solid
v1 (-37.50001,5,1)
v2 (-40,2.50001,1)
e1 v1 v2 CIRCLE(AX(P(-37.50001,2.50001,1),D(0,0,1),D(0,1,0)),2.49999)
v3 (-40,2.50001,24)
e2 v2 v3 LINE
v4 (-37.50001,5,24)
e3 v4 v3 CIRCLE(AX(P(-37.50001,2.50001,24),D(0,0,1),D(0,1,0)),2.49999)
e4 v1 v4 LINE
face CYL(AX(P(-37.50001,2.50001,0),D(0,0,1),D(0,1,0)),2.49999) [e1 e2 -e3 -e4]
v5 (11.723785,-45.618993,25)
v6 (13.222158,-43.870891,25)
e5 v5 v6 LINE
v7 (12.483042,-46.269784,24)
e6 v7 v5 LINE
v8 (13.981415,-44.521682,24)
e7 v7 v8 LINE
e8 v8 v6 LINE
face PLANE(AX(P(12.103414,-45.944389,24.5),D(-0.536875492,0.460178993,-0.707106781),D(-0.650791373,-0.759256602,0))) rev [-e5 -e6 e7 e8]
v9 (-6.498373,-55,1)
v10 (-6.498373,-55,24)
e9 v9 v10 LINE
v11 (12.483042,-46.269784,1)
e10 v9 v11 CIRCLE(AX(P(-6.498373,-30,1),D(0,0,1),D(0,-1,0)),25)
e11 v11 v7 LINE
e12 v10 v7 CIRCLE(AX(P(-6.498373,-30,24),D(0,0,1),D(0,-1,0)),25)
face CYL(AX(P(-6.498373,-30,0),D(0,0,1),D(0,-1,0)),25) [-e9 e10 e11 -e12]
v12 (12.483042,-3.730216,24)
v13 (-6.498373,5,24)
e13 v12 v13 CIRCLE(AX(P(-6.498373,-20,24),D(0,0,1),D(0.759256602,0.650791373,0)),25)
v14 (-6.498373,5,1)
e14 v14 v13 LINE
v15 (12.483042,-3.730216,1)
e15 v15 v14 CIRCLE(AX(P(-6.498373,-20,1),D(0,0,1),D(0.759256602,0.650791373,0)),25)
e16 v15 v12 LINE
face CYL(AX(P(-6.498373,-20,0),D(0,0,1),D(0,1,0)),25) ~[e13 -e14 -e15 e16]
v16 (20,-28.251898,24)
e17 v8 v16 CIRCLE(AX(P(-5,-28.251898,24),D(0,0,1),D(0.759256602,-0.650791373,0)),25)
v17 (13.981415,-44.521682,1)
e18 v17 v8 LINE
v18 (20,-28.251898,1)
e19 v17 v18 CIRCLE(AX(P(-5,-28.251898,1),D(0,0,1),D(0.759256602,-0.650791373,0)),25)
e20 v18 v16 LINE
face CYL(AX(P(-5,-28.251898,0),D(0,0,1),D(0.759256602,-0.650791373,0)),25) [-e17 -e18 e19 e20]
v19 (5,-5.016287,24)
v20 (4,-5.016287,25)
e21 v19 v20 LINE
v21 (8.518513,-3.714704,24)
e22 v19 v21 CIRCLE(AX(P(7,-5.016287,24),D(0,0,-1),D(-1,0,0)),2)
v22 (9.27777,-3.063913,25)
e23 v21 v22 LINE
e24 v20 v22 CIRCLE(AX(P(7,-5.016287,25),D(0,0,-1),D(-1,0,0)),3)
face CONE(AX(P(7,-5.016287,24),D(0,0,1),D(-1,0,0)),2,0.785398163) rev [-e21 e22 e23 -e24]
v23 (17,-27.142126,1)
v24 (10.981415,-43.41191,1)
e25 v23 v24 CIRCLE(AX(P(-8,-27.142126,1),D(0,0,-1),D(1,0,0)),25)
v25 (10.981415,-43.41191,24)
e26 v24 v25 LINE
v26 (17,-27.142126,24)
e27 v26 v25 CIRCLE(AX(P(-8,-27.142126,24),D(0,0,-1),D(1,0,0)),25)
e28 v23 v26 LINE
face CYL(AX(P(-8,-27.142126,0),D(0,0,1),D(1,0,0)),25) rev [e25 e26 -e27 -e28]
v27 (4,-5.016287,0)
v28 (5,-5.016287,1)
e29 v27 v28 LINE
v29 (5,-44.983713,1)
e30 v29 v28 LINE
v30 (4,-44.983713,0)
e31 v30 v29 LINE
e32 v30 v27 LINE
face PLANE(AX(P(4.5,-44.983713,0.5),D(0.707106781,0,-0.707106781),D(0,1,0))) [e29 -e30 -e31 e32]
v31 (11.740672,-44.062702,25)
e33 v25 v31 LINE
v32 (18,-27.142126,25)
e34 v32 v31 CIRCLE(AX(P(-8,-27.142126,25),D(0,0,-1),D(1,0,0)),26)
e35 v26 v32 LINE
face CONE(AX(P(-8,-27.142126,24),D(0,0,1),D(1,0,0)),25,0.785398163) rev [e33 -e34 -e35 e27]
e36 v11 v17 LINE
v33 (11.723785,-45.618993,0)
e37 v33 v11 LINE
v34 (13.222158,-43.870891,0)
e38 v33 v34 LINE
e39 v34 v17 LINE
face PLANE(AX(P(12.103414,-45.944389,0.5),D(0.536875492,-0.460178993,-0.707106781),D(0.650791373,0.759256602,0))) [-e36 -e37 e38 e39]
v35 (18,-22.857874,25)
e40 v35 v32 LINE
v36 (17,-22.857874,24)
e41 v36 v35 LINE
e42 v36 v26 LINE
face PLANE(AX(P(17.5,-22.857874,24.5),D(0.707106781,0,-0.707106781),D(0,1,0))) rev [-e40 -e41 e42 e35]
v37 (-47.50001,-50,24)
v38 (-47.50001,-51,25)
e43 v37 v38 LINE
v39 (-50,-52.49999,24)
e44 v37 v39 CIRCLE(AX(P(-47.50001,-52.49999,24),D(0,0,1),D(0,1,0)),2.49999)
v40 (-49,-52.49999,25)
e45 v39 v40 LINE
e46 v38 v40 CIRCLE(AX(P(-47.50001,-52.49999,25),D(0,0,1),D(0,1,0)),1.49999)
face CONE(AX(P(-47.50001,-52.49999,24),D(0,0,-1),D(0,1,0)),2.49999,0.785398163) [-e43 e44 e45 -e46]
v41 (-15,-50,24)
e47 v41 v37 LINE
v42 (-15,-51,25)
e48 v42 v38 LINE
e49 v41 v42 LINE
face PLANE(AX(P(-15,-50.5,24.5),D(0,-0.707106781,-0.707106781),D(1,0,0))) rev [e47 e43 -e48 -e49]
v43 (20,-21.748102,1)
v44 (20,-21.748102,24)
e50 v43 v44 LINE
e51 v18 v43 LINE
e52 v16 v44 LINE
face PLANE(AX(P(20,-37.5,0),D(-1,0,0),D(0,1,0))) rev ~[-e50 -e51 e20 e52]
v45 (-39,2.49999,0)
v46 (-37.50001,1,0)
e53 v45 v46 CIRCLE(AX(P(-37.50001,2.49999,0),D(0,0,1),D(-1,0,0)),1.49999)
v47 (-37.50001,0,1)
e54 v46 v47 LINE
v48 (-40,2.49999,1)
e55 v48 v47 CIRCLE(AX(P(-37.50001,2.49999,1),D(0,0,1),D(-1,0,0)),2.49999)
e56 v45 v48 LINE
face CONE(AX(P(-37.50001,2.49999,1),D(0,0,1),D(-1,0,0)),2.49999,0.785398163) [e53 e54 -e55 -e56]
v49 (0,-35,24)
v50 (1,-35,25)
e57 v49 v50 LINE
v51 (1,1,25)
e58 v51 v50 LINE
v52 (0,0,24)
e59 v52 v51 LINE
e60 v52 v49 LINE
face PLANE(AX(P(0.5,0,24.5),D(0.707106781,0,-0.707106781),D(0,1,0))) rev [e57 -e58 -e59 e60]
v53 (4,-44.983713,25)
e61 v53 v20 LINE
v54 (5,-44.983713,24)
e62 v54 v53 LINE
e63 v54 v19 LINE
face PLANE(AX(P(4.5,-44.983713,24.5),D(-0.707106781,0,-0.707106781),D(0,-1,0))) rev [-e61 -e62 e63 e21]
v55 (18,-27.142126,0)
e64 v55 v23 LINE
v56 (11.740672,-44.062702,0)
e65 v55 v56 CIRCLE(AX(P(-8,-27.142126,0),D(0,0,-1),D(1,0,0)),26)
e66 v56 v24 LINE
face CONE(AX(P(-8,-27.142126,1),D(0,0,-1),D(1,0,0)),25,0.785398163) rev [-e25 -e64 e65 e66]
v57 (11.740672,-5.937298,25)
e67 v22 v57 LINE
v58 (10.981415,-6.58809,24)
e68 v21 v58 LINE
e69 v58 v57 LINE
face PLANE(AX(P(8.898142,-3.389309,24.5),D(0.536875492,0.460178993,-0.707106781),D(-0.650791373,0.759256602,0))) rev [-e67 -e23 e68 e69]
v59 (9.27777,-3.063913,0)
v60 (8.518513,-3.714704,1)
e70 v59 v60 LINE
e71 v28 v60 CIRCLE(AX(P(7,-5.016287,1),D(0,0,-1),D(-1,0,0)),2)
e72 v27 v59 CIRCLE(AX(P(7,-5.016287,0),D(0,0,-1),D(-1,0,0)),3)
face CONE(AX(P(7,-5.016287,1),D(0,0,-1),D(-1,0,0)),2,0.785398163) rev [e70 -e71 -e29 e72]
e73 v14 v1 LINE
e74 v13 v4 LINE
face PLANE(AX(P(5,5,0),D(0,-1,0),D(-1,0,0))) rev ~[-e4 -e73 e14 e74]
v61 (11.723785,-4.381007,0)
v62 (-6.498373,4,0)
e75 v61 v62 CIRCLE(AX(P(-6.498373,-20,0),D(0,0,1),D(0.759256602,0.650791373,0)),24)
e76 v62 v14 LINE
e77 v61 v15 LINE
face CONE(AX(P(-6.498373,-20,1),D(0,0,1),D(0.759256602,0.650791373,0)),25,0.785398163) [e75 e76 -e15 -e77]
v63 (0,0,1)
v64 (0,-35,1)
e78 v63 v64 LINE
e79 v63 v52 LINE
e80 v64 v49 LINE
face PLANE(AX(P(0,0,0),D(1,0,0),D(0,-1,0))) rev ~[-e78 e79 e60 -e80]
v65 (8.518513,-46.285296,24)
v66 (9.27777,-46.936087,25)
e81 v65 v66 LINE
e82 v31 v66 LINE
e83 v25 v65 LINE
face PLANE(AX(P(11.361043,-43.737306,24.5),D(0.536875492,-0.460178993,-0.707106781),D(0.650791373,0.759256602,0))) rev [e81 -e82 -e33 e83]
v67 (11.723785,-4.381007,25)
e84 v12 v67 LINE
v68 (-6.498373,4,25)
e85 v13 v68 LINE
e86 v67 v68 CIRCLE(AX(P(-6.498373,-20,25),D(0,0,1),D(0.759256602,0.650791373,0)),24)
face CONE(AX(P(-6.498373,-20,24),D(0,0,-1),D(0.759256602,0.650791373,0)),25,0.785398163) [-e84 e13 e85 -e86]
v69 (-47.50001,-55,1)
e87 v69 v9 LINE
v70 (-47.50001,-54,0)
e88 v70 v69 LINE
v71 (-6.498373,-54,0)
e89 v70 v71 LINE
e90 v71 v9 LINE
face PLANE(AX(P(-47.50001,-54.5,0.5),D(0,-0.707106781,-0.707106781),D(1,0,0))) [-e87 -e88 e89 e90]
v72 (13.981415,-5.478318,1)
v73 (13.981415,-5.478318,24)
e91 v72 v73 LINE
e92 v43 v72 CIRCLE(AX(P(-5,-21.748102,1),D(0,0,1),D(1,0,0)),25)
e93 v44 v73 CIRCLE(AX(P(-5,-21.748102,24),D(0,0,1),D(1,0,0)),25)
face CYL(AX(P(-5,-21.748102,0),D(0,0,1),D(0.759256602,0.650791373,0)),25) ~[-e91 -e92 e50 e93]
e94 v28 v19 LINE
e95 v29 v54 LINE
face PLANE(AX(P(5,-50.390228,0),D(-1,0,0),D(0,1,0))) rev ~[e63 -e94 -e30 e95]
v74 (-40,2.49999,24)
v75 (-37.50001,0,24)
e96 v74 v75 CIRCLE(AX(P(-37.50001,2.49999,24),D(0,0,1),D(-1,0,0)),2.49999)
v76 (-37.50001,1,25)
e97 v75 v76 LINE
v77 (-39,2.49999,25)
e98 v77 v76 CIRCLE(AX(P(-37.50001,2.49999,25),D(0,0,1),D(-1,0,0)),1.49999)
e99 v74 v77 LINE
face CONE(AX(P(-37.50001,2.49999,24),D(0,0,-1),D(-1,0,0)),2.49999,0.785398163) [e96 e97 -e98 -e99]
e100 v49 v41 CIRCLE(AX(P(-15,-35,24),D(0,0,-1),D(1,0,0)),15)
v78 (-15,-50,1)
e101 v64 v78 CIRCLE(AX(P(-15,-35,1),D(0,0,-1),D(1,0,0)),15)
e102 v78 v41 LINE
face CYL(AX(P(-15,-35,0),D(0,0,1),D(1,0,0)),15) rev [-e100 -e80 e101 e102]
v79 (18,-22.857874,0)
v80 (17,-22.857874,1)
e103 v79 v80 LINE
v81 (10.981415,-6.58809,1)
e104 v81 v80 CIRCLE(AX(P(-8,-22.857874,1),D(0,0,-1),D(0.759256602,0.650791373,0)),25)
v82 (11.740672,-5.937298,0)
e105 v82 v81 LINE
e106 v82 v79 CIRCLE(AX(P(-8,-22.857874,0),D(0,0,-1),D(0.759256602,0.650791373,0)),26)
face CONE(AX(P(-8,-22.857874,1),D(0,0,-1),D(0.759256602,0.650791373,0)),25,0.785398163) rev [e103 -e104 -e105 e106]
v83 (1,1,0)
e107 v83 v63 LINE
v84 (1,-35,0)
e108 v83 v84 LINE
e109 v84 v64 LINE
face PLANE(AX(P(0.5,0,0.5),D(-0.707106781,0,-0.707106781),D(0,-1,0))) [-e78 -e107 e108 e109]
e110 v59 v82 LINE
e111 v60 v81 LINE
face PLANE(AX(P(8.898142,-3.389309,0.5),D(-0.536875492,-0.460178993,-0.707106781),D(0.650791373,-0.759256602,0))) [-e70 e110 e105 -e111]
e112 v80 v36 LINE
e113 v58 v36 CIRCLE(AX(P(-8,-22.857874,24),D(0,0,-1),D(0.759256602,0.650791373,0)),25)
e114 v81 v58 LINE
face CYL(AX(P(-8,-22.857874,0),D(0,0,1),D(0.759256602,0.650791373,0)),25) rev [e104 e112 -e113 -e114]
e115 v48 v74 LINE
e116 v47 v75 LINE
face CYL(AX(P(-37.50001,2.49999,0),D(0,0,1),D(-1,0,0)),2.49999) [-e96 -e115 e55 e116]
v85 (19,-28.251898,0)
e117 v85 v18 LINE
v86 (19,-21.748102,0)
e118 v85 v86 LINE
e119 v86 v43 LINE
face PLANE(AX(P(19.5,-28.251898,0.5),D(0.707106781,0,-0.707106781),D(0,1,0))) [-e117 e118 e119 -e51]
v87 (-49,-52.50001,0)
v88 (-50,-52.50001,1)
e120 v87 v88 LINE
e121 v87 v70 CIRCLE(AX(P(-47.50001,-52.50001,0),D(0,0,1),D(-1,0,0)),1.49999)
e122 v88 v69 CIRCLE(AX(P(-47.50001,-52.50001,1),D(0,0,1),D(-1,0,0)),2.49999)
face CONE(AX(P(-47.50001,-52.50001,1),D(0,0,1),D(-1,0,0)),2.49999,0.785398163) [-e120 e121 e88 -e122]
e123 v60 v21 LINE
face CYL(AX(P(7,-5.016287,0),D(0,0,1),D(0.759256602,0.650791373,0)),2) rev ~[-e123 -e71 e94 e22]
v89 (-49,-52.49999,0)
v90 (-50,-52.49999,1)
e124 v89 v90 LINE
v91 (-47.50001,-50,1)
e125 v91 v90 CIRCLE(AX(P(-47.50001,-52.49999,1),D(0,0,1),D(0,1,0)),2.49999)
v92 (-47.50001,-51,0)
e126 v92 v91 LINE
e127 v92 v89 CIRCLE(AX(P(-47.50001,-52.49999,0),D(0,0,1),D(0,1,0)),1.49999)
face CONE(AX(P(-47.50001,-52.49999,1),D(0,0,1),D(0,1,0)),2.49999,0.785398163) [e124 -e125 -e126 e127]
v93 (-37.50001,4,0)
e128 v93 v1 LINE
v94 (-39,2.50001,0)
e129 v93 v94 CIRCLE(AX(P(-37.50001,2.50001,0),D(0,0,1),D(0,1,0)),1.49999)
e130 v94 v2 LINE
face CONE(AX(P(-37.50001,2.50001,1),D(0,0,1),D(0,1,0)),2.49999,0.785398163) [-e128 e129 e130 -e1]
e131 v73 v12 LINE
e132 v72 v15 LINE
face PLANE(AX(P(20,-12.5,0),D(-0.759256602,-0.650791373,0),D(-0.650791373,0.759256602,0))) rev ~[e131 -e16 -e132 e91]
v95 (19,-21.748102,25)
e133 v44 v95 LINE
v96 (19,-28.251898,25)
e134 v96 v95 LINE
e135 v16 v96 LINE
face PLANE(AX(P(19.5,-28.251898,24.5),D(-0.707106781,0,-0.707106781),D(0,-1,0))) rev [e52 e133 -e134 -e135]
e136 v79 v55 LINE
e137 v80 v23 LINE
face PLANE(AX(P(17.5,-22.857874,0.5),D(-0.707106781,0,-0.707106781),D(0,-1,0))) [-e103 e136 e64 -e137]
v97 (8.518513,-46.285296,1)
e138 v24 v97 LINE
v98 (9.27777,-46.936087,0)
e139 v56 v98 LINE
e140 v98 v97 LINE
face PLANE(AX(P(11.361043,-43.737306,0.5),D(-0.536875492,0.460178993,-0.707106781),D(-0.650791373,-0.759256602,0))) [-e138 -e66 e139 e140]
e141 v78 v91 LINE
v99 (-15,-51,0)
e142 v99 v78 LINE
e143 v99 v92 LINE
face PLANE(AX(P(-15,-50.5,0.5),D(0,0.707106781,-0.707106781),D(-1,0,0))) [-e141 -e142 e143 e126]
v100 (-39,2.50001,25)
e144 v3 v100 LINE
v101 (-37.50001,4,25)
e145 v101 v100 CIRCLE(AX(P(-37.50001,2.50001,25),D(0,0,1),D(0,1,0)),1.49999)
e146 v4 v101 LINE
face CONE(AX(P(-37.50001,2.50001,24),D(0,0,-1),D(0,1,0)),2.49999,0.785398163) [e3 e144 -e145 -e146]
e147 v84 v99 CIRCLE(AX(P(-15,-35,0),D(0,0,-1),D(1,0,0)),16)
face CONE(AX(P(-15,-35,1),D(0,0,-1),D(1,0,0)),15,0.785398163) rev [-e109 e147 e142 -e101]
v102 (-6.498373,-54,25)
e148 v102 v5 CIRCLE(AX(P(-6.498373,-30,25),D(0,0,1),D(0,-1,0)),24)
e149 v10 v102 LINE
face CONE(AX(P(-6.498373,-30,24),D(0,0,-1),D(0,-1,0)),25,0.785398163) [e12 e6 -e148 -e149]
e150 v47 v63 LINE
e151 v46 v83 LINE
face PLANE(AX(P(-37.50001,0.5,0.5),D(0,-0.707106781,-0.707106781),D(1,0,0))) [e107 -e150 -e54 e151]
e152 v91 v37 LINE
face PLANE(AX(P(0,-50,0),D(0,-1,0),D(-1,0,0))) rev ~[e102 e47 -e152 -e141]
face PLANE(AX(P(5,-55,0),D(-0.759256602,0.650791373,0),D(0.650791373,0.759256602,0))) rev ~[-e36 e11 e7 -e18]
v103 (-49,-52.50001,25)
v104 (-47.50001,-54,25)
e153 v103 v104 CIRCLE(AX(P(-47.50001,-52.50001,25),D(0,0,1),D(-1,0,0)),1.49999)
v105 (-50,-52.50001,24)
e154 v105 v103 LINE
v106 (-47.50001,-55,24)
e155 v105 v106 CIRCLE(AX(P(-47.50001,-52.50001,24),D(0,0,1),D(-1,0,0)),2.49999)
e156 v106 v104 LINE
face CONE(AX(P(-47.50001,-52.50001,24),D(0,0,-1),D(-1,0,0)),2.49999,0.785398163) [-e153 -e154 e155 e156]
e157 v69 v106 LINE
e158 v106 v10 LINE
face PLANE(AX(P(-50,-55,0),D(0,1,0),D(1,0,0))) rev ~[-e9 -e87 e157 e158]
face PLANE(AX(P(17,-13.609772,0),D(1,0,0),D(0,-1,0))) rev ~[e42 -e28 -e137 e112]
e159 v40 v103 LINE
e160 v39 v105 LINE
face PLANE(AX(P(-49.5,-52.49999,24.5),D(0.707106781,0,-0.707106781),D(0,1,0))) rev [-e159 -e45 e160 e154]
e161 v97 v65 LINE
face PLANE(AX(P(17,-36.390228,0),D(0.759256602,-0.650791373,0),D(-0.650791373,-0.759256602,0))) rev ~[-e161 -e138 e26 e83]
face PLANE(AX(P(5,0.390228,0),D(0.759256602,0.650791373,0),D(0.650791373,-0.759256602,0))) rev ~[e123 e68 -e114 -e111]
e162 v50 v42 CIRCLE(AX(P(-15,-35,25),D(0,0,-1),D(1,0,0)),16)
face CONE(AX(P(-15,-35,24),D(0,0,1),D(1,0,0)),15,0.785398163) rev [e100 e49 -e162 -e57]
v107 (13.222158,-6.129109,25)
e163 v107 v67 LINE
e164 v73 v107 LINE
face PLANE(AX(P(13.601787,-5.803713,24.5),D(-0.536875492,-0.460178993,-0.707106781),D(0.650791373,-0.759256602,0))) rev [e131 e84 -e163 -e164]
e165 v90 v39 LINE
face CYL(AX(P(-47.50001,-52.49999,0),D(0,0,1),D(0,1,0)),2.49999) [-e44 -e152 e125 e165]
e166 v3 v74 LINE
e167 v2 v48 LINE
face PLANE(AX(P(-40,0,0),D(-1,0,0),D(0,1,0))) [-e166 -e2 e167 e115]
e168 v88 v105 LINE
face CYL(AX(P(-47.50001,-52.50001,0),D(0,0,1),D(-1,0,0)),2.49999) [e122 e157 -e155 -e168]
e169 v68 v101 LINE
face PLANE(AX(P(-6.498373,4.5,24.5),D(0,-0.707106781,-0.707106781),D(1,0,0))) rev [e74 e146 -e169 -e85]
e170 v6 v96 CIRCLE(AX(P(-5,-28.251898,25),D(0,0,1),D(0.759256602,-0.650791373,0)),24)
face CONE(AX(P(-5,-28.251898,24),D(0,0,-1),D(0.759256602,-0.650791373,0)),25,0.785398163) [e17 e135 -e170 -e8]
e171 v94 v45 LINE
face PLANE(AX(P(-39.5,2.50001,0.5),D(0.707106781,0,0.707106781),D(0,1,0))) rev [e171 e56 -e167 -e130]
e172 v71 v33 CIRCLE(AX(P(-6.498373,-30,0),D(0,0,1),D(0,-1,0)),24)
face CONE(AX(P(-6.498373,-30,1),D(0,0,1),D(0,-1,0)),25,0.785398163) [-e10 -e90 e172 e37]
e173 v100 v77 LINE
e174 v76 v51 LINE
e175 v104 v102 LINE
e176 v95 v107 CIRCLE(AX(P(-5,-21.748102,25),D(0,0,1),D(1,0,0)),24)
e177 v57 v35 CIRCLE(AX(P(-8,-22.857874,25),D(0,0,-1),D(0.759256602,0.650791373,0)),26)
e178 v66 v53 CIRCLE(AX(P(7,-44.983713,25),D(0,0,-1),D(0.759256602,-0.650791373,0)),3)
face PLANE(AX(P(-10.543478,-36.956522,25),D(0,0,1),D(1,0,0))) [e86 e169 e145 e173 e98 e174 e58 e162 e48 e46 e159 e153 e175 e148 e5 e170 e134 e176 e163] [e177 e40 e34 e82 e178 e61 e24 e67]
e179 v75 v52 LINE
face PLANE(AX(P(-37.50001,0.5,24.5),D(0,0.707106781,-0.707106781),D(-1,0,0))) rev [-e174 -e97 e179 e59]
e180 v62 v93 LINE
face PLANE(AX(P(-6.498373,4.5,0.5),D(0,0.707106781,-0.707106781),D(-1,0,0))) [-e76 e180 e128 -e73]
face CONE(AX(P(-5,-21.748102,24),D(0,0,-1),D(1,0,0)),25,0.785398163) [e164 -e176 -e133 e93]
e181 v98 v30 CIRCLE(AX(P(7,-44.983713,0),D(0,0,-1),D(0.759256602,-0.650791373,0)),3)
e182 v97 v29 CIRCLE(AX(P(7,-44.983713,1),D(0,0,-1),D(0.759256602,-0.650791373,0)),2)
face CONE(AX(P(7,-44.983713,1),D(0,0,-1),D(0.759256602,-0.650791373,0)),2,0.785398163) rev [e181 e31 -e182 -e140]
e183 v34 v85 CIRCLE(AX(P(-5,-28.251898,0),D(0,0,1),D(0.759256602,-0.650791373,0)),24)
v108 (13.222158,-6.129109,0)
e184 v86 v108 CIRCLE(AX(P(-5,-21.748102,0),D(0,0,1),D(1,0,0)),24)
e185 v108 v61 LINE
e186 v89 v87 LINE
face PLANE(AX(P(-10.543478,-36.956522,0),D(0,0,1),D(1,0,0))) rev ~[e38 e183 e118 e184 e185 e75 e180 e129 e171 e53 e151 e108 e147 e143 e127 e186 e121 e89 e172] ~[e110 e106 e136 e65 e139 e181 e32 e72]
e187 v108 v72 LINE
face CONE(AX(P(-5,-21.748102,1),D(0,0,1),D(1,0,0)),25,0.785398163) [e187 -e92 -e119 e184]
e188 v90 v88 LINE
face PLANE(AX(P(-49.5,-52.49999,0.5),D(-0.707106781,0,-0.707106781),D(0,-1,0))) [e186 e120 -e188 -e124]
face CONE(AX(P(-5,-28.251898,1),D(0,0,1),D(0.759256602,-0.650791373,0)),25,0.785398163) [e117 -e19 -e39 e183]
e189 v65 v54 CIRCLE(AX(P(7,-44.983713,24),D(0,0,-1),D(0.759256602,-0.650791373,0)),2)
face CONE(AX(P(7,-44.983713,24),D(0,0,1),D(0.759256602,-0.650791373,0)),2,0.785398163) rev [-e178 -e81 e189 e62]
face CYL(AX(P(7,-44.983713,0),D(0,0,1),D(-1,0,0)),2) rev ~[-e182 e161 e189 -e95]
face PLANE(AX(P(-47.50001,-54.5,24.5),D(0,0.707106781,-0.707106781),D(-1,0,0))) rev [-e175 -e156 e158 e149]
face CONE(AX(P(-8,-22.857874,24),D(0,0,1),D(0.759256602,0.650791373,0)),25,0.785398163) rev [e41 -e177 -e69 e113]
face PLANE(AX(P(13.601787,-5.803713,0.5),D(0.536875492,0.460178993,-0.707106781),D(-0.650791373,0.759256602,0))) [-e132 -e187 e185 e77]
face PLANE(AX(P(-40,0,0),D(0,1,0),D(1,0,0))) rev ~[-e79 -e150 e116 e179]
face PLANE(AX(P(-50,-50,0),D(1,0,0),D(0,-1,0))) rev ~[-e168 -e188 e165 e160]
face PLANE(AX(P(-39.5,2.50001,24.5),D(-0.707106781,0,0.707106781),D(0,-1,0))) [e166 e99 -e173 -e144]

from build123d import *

# Parameters (mm, degrees)
F0_W     = 40
F0_H     = 5
F1_DEPTH = 25
F2_R     = 15
F3_R     = 25
F4_R     = 2.49999
F5_R     = 2
F6_SIZE  = 1


# Not quite as in the source:
# - a fillet or chamfer is up to 0.001 mm smaller than in the source, because OpenCascade refuses the exact size


with BuildPart() as f1:
    # F0 (on Top) → F1 (new body)
    with BuildSketch(Plane.XY):
        Polygon((0, 5), (0, 0), (0, -50), (-50, -50), (-50, -55), (5, -55), (5, -50.3902277714), (5, 0.3902277714), (5, 5), align=None)
        Polygon((20, -12.5), (5, 5), (5, 0.3902277714), (17, -13.6097722286), (17, -36.3902277714), (5, -50.3902277714), (5, -55), (20, -37.5), align=None)
        with Locations((-20, 2.5)):
            Rectangle(F0_W, F0_H)
    extrude(amount=F1_DEPTH)

    # F2
    f2_edges = [f1.edges().sort_by_distance(p)[0] for p in [
        (0, -50, 12.5),
    ]]
    fillet(f2_edges, radius=F2_R)

    # F3
    f3_edges = [f1.edges().sort_by_distance(p)[0] for p in [
        (5, -55, 12.5),
        (20, -37.5, 12.5),
        (20, -12.5, 12.5),
        (5, 5, 12.5),
        (17, -36.390228, 12.5),
        (17, -13.609772, 12.5),
    ]]
    fillet(f3_edges, radius=F3_R)

    # F4 (radius 2.5 in the source; OpenCascade refuses exactly that, so slightly less here)
    f4_edges = [f1.edges().sort_by_distance(p)[0] for p in [
        (-50, -55, 12.5),
        (-50, -50, 12.5),
        (-40, 0, 12.5),
        (-40, 5, 12.5),
    ]]
    fillet(f4_edges, radius=F4_R)

    # F5
    f5_edges = [f1.edges().sort_by_distance(p)[0] for p in [
        (5, -50.390228, 12.5),
        (5, 0.390228, 12.5),
    ]]
    fillet(f5_edges, radius=F5_R)

    # F6
    f6_edges = [f1.edges().sort_by_distance(p)[0] for p in [
        (9.749964, -5.151397, 25),
        (6.306108, -3.140517, 25),
        (15.447125, -14.184218, 25),
        (5, -25, 25),
        (17, -25, 25),
        (6.306108, -46.859483, 25),
        (15.447125, -35.815782, 25),
        (9.749964, -44.848603, 25),
        (-21.999192, 5, 25),
        (-39.26777, 4.26777, 25),
        (3.948047, 2.712822, 25),
        (-40, 2.5, 25),
        (13.232229, -4.604267, 25),
        (-39.26777, 0.73223, 25),
        (18.447125, -13.074446, 25),
        (-18.750005, 0, 25),
        (20, -25, 25),
        (0, -17.5, 25),
        (18.447125, -36.925554, 25),
        (-4.393398, -45.606602, 25),
        (13.232229, -45.395733, 25),
        (-31.250005, -50, 25),
        (3.948047, -52.712822, 25),
        (-49.26777, -50.73223, 25),
        (-26.999192, -55, 25),
        (-50, -52.5, 25),
        (-49.26777, -54.26777, 25),
        (9.749964, -5.151397, 0),
        (6.306108, -3.140517, 0),
        (15.447125, -14.184218, 0),
        (5, -25, 0),
        (17, -25, 0),
        (6.306108, -46.859483, 0),
        (15.447125, -35.815782, 0),
        (9.749964, -44.848603, 0),
        (-21.999192, 5, 0),
        (-39.26777, 4.26777, 0),
        (3.948047, 2.712822, 0),
        (-40, 2.5, 0),
        (13.232229, -4.604267, 0),
        (-39.26777, 0.73223, 0),
        (18.447125, -13.074446, 0),
        (-18.750005, 0, 0),
        (20, -25, 0),
        (0, -17.5, 0),
        (18.447125, -36.925554, 0),
        (-4.393398, -45.606602, 0),
        (13.232229, -45.395733, 0),
        (-31.250005, -50, 0),
        (3.948047, -52.712822, 0),
        (-49.26777, -50.73223, 0),
        (-26.999192, -55, 0),
        (-50, -52.5, 0),
        (-49.26777, -54.26777, 0),
    ]]
    chamfer(f6_edges, length=F6_SIZE)


solid = f1.part
